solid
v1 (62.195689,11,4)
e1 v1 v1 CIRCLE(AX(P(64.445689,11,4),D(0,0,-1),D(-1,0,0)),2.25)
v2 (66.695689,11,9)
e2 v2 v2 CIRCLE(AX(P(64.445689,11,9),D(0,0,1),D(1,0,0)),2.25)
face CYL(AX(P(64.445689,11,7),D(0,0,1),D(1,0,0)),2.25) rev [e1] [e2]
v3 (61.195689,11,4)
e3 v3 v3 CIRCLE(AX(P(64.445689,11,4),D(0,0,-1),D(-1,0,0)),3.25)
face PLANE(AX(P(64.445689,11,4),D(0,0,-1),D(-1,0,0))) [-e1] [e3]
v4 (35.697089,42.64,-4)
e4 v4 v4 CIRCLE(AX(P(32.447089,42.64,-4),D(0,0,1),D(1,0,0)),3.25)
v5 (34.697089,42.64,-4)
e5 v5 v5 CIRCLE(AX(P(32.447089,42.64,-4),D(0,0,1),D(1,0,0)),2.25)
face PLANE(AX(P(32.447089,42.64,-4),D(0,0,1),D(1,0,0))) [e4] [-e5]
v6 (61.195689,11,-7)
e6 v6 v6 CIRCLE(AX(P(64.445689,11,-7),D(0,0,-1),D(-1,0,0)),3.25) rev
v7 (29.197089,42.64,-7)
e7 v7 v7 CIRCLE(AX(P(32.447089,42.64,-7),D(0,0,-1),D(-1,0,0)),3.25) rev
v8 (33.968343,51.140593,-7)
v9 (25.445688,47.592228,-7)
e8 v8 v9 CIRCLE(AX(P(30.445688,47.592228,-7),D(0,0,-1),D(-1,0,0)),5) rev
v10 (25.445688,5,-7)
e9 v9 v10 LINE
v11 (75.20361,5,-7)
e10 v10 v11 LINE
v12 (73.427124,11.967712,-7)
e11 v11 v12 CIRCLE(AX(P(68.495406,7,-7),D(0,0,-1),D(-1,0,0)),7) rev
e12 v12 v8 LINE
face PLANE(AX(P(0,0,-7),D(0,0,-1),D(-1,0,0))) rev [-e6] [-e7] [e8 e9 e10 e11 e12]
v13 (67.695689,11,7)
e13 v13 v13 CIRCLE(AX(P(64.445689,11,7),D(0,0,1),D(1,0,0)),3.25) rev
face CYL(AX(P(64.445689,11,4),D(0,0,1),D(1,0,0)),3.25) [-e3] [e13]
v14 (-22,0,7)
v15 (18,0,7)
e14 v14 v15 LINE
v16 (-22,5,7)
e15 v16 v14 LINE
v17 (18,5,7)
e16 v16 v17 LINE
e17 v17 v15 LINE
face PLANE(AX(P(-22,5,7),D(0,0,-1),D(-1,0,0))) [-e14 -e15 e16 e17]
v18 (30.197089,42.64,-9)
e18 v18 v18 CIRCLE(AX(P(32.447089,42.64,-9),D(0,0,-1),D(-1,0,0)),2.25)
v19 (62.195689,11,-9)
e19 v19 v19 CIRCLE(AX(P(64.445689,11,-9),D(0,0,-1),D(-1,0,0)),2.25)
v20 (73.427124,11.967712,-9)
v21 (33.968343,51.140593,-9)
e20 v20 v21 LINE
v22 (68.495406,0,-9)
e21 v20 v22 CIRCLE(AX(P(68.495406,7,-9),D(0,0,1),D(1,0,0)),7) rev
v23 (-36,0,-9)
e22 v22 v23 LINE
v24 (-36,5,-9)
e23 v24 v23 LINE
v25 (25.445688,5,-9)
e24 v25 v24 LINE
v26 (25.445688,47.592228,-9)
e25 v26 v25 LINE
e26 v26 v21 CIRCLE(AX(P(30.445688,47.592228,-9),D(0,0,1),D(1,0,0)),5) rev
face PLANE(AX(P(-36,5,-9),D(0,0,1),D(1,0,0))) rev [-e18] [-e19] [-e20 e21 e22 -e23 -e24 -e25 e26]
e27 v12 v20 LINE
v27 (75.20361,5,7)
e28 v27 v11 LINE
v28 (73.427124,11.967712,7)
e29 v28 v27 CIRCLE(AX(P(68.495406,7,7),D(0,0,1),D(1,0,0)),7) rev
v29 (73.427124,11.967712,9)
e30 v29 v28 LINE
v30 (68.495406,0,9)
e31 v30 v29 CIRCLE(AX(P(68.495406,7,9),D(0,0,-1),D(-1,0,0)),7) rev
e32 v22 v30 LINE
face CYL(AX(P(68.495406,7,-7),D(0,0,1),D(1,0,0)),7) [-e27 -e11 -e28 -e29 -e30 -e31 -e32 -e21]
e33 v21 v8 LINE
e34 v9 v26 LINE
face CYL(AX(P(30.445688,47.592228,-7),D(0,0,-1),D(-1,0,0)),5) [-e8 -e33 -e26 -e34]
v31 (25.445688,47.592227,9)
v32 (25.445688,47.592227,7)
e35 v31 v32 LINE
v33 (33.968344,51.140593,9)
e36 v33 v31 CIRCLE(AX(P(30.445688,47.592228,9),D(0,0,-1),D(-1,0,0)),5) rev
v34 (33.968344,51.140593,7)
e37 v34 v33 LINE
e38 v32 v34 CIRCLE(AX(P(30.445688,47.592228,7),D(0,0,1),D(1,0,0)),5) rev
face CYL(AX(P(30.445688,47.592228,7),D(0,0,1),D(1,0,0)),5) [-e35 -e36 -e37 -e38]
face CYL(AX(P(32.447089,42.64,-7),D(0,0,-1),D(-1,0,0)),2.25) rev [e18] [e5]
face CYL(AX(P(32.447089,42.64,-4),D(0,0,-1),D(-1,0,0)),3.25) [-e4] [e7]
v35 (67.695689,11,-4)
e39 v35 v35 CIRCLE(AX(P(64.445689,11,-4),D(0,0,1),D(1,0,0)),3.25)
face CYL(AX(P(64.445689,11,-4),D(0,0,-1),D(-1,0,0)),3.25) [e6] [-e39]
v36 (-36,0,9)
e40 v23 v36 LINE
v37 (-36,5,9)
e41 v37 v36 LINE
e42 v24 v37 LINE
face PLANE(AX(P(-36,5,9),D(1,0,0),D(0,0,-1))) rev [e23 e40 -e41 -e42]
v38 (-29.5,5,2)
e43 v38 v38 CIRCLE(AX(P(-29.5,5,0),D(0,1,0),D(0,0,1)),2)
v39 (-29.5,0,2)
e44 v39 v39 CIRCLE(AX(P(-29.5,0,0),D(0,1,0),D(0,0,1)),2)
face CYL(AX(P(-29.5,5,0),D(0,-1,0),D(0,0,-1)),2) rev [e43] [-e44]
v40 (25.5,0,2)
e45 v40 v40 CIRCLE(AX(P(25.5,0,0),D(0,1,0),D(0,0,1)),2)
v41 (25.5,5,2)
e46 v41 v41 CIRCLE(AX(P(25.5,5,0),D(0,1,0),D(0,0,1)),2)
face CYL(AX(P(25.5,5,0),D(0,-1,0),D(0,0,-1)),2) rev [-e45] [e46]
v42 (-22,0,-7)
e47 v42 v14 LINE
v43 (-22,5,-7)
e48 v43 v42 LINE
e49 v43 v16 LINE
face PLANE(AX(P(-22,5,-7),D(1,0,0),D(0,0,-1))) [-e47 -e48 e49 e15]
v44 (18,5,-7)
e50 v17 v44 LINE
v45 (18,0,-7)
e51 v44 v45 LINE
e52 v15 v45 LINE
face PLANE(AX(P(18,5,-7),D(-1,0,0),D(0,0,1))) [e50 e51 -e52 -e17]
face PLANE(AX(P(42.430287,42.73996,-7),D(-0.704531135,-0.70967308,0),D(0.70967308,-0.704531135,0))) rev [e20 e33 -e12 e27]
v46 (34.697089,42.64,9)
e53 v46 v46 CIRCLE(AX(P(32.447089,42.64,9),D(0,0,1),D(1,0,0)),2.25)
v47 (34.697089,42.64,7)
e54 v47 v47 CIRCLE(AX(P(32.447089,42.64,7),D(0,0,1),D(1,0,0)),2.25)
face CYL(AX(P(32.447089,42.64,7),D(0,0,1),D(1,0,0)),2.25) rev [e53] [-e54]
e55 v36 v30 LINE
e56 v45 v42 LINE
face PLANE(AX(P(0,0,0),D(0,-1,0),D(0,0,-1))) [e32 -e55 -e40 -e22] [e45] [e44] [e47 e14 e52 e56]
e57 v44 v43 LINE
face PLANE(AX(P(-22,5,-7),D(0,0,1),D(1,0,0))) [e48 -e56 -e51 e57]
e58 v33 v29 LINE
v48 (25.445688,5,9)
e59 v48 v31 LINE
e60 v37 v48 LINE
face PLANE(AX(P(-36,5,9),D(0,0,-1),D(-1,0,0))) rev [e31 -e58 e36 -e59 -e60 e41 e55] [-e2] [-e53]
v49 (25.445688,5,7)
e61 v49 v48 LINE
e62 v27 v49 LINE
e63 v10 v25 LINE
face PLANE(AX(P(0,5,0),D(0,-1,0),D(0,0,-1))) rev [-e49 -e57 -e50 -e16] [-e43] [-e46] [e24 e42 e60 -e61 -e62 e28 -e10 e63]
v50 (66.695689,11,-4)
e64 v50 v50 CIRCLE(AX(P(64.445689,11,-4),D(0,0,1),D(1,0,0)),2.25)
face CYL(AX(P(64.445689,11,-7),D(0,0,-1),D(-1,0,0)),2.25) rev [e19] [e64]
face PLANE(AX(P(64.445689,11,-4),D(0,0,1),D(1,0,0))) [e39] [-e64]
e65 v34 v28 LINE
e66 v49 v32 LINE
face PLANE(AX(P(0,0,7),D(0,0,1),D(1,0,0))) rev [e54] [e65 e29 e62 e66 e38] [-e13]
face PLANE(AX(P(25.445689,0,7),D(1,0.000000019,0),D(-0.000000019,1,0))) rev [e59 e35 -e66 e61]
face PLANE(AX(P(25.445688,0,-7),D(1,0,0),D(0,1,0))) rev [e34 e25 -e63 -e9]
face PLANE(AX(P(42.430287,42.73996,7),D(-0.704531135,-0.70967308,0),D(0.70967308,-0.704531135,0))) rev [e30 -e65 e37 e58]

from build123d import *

# Parameters (mm, degrees)
SKETCH1_W           = 116.445688755
SKETCH1_H           = 18
SKETCH1_R           = 2
SKETCH1_W_2         = 40
SKETCH1_H_2         = 14
BOSS_EXTRUDE1_DEPTH = 5
SKETCH2_R           = 2.25
BOSS_EXTRUDE2_DEPTH = 2
BOSS_EXTRUDE3_START = -2
SKETCH4_R           = 2.25
BOSS_EXTRUDE3_DEPTH = 2
FILLET2_R           = 7
FILLET3_R           = 5
SKETCH6_R           = 3.25
SKETCH6_R_2         = 2.25
BOSS_EXTRUDE4_DEPTH = 3
BOSS_EXTRUDE5_START = 3
SKETCH7_R           = 3.25
SKETCH7_R_2         = 2.25
BOSS_EXTRUDE5_DEPTH = 3


with BuildPart() as part:
    # Sketch1 → Boss-Extrude1 (new body)
    with BuildSketch(Plane(origin=(0, 0, 0), x_dir=(1, 0, 0), z_dir=(0, 1, 0))):
        with Locations((22.222844378, 0)):
            Rectangle(SKETCH1_W, SKETCH1_H)
        with Locations(Location((-29.5, 0, 0), (0, 0, 270))):
            Circle(SKETCH1_R, mode=Mode.SUBTRACT)
        with Locations(Location((25.5, 0, 0), (0, 0, 270))):
            Circle(SKETCH1_R, mode=Mode.SUBTRACT)
        with Locations((-2, 0)):
            Rectangle(SKETCH1_W_2, SKETCH1_H_2, mode=Mode.SUBTRACT)
    extrude(amount=BOSS_EXTRUDE1_DEPTH)

    # Sketch2 → Boss-Extrude2 (add)
    # profile 1 of 2: a face of its own
    with BuildSketch(Plane.XY.offset(9)):
        Polygon((85.482180719, 0), (80.445688755, 5), (80.445688755, 0), align=None)
    # profile 2 of 2: a face of its own
    with BuildSketch(Plane.XY.offset(9)):
        Polygon((25.445687742, 59.601497833), (25.445688755, 5), (80.445688755, 5), align=None)
        with Locations((64.445688755, 11)):
            Circle(SKETCH2_R, mode=Mode.SUBTRACT)
        with Locations((32.447088786, 42.64)):
            Circle(SKETCH2_R, mode=Mode.SUBTRACT)
    extrude(amount=-BOSS_EXTRUDE2_DEPTH)

    # Sketch4 → Boss-Extrude3 (add)
    # profile 1 of 2: a face of its own
    with BuildSketch(Plane(origin=(0, 0, -9), x_dir=(-1, 0, 0), z_dir=(0, 0, -1)).offset(BOSS_EXTRUDE3_START)):
        Polygon((-25.445687742, 59.601497833), (-80.445688755, 5), (-25.445687742, 5), align=None)
        with Locations(Location((-64.445688755, 11, 0), (0, 0, 180))):
            Circle(SKETCH4_R, mode=Mode.SUBTRACT)
        with Locations(Location((-32.447088786, 42.64, 0), (0, 0, 180))):
            Circle(SKETCH4_R, mode=Mode.SUBTRACT)
    # profile 2 of 2: a face of its own
    with BuildSketch(Plane(origin=(0, 0, -9), x_dir=(-1, 0, 0), z_dir=(0, 0, -1)).offset(BOSS_EXTRUDE3_START)):
        Polygon((-80.445688755, 5), (-85.482180719, 0), (-80.445688755, 0), align=None)
    extrude(amount=BOSS_EXTRUDE3_DEPTH)

    # Fillet2
    # the kernel refuses this fillet: 7 mm, written as the material it takes off along each edge
    with BuildSketch(Plane(origin=(85.482180719, 0, 35.466936405), x_dir=(-1, 0, 0), z_dir=(0, 0, -1))) as fillet2_piece_1:
        with BuildLine():
            CenterArc((FILLET2_R * 2.42668208026, FILLET2_R), FILLET2_R, 134.791677578, 135.208322422)
            Line((FILLET2_R * 1.72215094548, FILLET2_R * 1.70967307975), (0, 0))
            Line((0, 0), (FILLET2_R * 2.42668208026, 0))
        make_face()
    extrude(amount=86.933872809, mode=Mode.SUBTRACT)

    # Fillet3
    fillet3_edges = [part.edges().sort_by_distance(p)[0] for p in [
        (25.445687742, 59.601497833, 8),
        (25.445687742, 59.601497833, -8),
    ]]
    fillet(fillet3_edges, radius=FILLET3_R)

    # Sketch6 → Boss-Extrude4 (add)
    with BuildSketch(Plane(origin=(0, 0, 7), x_dir=(-1, 0, 0), z_dir=(0, 0, -1))):
        with Locations(Location((-64.445688755, 11, 0), (0, 0, 180))):
            Circle(SKETCH6_R)
        with Locations(Location((-64.445688755, 11, 0), (0, 0, 180))):
            Circle(SKETCH6_R_2, mode=Mode.SUBTRACT)
    extrude(amount=BOSS_EXTRUDE4_DEPTH)

    # Sketch7 → Boss-Extrude5 (add)
    # profile 1 of 2: a face of its own
    with BuildSketch(Plane.XY.offset(-7).offset(BOSS_EXTRUDE5_START)):
        with Locations(Location((32.447088786, 42.64, 0), (0, 0, 180))):
            Circle(SKETCH7_R)
        with Locations((32.447088786, 42.64)):
            Circle(SKETCH7_R_2, mode=Mode.SUBTRACT)
    # profile 2 of 2: a face of its own
    with BuildSketch(Plane.XY.offset(-7).offset(BOSS_EXTRUDE5_START)):
        with Locations((64.445688755, 11)):
            Circle(SKETCH7_R)
        with Locations((64.445688755, 11)):
            Circle(SKETCH7_R_2, mode=Mode.SUBTRACT)
    extrude(amount=-BOSS_EXTRUDE5_DEPTH)


solid = part.part
